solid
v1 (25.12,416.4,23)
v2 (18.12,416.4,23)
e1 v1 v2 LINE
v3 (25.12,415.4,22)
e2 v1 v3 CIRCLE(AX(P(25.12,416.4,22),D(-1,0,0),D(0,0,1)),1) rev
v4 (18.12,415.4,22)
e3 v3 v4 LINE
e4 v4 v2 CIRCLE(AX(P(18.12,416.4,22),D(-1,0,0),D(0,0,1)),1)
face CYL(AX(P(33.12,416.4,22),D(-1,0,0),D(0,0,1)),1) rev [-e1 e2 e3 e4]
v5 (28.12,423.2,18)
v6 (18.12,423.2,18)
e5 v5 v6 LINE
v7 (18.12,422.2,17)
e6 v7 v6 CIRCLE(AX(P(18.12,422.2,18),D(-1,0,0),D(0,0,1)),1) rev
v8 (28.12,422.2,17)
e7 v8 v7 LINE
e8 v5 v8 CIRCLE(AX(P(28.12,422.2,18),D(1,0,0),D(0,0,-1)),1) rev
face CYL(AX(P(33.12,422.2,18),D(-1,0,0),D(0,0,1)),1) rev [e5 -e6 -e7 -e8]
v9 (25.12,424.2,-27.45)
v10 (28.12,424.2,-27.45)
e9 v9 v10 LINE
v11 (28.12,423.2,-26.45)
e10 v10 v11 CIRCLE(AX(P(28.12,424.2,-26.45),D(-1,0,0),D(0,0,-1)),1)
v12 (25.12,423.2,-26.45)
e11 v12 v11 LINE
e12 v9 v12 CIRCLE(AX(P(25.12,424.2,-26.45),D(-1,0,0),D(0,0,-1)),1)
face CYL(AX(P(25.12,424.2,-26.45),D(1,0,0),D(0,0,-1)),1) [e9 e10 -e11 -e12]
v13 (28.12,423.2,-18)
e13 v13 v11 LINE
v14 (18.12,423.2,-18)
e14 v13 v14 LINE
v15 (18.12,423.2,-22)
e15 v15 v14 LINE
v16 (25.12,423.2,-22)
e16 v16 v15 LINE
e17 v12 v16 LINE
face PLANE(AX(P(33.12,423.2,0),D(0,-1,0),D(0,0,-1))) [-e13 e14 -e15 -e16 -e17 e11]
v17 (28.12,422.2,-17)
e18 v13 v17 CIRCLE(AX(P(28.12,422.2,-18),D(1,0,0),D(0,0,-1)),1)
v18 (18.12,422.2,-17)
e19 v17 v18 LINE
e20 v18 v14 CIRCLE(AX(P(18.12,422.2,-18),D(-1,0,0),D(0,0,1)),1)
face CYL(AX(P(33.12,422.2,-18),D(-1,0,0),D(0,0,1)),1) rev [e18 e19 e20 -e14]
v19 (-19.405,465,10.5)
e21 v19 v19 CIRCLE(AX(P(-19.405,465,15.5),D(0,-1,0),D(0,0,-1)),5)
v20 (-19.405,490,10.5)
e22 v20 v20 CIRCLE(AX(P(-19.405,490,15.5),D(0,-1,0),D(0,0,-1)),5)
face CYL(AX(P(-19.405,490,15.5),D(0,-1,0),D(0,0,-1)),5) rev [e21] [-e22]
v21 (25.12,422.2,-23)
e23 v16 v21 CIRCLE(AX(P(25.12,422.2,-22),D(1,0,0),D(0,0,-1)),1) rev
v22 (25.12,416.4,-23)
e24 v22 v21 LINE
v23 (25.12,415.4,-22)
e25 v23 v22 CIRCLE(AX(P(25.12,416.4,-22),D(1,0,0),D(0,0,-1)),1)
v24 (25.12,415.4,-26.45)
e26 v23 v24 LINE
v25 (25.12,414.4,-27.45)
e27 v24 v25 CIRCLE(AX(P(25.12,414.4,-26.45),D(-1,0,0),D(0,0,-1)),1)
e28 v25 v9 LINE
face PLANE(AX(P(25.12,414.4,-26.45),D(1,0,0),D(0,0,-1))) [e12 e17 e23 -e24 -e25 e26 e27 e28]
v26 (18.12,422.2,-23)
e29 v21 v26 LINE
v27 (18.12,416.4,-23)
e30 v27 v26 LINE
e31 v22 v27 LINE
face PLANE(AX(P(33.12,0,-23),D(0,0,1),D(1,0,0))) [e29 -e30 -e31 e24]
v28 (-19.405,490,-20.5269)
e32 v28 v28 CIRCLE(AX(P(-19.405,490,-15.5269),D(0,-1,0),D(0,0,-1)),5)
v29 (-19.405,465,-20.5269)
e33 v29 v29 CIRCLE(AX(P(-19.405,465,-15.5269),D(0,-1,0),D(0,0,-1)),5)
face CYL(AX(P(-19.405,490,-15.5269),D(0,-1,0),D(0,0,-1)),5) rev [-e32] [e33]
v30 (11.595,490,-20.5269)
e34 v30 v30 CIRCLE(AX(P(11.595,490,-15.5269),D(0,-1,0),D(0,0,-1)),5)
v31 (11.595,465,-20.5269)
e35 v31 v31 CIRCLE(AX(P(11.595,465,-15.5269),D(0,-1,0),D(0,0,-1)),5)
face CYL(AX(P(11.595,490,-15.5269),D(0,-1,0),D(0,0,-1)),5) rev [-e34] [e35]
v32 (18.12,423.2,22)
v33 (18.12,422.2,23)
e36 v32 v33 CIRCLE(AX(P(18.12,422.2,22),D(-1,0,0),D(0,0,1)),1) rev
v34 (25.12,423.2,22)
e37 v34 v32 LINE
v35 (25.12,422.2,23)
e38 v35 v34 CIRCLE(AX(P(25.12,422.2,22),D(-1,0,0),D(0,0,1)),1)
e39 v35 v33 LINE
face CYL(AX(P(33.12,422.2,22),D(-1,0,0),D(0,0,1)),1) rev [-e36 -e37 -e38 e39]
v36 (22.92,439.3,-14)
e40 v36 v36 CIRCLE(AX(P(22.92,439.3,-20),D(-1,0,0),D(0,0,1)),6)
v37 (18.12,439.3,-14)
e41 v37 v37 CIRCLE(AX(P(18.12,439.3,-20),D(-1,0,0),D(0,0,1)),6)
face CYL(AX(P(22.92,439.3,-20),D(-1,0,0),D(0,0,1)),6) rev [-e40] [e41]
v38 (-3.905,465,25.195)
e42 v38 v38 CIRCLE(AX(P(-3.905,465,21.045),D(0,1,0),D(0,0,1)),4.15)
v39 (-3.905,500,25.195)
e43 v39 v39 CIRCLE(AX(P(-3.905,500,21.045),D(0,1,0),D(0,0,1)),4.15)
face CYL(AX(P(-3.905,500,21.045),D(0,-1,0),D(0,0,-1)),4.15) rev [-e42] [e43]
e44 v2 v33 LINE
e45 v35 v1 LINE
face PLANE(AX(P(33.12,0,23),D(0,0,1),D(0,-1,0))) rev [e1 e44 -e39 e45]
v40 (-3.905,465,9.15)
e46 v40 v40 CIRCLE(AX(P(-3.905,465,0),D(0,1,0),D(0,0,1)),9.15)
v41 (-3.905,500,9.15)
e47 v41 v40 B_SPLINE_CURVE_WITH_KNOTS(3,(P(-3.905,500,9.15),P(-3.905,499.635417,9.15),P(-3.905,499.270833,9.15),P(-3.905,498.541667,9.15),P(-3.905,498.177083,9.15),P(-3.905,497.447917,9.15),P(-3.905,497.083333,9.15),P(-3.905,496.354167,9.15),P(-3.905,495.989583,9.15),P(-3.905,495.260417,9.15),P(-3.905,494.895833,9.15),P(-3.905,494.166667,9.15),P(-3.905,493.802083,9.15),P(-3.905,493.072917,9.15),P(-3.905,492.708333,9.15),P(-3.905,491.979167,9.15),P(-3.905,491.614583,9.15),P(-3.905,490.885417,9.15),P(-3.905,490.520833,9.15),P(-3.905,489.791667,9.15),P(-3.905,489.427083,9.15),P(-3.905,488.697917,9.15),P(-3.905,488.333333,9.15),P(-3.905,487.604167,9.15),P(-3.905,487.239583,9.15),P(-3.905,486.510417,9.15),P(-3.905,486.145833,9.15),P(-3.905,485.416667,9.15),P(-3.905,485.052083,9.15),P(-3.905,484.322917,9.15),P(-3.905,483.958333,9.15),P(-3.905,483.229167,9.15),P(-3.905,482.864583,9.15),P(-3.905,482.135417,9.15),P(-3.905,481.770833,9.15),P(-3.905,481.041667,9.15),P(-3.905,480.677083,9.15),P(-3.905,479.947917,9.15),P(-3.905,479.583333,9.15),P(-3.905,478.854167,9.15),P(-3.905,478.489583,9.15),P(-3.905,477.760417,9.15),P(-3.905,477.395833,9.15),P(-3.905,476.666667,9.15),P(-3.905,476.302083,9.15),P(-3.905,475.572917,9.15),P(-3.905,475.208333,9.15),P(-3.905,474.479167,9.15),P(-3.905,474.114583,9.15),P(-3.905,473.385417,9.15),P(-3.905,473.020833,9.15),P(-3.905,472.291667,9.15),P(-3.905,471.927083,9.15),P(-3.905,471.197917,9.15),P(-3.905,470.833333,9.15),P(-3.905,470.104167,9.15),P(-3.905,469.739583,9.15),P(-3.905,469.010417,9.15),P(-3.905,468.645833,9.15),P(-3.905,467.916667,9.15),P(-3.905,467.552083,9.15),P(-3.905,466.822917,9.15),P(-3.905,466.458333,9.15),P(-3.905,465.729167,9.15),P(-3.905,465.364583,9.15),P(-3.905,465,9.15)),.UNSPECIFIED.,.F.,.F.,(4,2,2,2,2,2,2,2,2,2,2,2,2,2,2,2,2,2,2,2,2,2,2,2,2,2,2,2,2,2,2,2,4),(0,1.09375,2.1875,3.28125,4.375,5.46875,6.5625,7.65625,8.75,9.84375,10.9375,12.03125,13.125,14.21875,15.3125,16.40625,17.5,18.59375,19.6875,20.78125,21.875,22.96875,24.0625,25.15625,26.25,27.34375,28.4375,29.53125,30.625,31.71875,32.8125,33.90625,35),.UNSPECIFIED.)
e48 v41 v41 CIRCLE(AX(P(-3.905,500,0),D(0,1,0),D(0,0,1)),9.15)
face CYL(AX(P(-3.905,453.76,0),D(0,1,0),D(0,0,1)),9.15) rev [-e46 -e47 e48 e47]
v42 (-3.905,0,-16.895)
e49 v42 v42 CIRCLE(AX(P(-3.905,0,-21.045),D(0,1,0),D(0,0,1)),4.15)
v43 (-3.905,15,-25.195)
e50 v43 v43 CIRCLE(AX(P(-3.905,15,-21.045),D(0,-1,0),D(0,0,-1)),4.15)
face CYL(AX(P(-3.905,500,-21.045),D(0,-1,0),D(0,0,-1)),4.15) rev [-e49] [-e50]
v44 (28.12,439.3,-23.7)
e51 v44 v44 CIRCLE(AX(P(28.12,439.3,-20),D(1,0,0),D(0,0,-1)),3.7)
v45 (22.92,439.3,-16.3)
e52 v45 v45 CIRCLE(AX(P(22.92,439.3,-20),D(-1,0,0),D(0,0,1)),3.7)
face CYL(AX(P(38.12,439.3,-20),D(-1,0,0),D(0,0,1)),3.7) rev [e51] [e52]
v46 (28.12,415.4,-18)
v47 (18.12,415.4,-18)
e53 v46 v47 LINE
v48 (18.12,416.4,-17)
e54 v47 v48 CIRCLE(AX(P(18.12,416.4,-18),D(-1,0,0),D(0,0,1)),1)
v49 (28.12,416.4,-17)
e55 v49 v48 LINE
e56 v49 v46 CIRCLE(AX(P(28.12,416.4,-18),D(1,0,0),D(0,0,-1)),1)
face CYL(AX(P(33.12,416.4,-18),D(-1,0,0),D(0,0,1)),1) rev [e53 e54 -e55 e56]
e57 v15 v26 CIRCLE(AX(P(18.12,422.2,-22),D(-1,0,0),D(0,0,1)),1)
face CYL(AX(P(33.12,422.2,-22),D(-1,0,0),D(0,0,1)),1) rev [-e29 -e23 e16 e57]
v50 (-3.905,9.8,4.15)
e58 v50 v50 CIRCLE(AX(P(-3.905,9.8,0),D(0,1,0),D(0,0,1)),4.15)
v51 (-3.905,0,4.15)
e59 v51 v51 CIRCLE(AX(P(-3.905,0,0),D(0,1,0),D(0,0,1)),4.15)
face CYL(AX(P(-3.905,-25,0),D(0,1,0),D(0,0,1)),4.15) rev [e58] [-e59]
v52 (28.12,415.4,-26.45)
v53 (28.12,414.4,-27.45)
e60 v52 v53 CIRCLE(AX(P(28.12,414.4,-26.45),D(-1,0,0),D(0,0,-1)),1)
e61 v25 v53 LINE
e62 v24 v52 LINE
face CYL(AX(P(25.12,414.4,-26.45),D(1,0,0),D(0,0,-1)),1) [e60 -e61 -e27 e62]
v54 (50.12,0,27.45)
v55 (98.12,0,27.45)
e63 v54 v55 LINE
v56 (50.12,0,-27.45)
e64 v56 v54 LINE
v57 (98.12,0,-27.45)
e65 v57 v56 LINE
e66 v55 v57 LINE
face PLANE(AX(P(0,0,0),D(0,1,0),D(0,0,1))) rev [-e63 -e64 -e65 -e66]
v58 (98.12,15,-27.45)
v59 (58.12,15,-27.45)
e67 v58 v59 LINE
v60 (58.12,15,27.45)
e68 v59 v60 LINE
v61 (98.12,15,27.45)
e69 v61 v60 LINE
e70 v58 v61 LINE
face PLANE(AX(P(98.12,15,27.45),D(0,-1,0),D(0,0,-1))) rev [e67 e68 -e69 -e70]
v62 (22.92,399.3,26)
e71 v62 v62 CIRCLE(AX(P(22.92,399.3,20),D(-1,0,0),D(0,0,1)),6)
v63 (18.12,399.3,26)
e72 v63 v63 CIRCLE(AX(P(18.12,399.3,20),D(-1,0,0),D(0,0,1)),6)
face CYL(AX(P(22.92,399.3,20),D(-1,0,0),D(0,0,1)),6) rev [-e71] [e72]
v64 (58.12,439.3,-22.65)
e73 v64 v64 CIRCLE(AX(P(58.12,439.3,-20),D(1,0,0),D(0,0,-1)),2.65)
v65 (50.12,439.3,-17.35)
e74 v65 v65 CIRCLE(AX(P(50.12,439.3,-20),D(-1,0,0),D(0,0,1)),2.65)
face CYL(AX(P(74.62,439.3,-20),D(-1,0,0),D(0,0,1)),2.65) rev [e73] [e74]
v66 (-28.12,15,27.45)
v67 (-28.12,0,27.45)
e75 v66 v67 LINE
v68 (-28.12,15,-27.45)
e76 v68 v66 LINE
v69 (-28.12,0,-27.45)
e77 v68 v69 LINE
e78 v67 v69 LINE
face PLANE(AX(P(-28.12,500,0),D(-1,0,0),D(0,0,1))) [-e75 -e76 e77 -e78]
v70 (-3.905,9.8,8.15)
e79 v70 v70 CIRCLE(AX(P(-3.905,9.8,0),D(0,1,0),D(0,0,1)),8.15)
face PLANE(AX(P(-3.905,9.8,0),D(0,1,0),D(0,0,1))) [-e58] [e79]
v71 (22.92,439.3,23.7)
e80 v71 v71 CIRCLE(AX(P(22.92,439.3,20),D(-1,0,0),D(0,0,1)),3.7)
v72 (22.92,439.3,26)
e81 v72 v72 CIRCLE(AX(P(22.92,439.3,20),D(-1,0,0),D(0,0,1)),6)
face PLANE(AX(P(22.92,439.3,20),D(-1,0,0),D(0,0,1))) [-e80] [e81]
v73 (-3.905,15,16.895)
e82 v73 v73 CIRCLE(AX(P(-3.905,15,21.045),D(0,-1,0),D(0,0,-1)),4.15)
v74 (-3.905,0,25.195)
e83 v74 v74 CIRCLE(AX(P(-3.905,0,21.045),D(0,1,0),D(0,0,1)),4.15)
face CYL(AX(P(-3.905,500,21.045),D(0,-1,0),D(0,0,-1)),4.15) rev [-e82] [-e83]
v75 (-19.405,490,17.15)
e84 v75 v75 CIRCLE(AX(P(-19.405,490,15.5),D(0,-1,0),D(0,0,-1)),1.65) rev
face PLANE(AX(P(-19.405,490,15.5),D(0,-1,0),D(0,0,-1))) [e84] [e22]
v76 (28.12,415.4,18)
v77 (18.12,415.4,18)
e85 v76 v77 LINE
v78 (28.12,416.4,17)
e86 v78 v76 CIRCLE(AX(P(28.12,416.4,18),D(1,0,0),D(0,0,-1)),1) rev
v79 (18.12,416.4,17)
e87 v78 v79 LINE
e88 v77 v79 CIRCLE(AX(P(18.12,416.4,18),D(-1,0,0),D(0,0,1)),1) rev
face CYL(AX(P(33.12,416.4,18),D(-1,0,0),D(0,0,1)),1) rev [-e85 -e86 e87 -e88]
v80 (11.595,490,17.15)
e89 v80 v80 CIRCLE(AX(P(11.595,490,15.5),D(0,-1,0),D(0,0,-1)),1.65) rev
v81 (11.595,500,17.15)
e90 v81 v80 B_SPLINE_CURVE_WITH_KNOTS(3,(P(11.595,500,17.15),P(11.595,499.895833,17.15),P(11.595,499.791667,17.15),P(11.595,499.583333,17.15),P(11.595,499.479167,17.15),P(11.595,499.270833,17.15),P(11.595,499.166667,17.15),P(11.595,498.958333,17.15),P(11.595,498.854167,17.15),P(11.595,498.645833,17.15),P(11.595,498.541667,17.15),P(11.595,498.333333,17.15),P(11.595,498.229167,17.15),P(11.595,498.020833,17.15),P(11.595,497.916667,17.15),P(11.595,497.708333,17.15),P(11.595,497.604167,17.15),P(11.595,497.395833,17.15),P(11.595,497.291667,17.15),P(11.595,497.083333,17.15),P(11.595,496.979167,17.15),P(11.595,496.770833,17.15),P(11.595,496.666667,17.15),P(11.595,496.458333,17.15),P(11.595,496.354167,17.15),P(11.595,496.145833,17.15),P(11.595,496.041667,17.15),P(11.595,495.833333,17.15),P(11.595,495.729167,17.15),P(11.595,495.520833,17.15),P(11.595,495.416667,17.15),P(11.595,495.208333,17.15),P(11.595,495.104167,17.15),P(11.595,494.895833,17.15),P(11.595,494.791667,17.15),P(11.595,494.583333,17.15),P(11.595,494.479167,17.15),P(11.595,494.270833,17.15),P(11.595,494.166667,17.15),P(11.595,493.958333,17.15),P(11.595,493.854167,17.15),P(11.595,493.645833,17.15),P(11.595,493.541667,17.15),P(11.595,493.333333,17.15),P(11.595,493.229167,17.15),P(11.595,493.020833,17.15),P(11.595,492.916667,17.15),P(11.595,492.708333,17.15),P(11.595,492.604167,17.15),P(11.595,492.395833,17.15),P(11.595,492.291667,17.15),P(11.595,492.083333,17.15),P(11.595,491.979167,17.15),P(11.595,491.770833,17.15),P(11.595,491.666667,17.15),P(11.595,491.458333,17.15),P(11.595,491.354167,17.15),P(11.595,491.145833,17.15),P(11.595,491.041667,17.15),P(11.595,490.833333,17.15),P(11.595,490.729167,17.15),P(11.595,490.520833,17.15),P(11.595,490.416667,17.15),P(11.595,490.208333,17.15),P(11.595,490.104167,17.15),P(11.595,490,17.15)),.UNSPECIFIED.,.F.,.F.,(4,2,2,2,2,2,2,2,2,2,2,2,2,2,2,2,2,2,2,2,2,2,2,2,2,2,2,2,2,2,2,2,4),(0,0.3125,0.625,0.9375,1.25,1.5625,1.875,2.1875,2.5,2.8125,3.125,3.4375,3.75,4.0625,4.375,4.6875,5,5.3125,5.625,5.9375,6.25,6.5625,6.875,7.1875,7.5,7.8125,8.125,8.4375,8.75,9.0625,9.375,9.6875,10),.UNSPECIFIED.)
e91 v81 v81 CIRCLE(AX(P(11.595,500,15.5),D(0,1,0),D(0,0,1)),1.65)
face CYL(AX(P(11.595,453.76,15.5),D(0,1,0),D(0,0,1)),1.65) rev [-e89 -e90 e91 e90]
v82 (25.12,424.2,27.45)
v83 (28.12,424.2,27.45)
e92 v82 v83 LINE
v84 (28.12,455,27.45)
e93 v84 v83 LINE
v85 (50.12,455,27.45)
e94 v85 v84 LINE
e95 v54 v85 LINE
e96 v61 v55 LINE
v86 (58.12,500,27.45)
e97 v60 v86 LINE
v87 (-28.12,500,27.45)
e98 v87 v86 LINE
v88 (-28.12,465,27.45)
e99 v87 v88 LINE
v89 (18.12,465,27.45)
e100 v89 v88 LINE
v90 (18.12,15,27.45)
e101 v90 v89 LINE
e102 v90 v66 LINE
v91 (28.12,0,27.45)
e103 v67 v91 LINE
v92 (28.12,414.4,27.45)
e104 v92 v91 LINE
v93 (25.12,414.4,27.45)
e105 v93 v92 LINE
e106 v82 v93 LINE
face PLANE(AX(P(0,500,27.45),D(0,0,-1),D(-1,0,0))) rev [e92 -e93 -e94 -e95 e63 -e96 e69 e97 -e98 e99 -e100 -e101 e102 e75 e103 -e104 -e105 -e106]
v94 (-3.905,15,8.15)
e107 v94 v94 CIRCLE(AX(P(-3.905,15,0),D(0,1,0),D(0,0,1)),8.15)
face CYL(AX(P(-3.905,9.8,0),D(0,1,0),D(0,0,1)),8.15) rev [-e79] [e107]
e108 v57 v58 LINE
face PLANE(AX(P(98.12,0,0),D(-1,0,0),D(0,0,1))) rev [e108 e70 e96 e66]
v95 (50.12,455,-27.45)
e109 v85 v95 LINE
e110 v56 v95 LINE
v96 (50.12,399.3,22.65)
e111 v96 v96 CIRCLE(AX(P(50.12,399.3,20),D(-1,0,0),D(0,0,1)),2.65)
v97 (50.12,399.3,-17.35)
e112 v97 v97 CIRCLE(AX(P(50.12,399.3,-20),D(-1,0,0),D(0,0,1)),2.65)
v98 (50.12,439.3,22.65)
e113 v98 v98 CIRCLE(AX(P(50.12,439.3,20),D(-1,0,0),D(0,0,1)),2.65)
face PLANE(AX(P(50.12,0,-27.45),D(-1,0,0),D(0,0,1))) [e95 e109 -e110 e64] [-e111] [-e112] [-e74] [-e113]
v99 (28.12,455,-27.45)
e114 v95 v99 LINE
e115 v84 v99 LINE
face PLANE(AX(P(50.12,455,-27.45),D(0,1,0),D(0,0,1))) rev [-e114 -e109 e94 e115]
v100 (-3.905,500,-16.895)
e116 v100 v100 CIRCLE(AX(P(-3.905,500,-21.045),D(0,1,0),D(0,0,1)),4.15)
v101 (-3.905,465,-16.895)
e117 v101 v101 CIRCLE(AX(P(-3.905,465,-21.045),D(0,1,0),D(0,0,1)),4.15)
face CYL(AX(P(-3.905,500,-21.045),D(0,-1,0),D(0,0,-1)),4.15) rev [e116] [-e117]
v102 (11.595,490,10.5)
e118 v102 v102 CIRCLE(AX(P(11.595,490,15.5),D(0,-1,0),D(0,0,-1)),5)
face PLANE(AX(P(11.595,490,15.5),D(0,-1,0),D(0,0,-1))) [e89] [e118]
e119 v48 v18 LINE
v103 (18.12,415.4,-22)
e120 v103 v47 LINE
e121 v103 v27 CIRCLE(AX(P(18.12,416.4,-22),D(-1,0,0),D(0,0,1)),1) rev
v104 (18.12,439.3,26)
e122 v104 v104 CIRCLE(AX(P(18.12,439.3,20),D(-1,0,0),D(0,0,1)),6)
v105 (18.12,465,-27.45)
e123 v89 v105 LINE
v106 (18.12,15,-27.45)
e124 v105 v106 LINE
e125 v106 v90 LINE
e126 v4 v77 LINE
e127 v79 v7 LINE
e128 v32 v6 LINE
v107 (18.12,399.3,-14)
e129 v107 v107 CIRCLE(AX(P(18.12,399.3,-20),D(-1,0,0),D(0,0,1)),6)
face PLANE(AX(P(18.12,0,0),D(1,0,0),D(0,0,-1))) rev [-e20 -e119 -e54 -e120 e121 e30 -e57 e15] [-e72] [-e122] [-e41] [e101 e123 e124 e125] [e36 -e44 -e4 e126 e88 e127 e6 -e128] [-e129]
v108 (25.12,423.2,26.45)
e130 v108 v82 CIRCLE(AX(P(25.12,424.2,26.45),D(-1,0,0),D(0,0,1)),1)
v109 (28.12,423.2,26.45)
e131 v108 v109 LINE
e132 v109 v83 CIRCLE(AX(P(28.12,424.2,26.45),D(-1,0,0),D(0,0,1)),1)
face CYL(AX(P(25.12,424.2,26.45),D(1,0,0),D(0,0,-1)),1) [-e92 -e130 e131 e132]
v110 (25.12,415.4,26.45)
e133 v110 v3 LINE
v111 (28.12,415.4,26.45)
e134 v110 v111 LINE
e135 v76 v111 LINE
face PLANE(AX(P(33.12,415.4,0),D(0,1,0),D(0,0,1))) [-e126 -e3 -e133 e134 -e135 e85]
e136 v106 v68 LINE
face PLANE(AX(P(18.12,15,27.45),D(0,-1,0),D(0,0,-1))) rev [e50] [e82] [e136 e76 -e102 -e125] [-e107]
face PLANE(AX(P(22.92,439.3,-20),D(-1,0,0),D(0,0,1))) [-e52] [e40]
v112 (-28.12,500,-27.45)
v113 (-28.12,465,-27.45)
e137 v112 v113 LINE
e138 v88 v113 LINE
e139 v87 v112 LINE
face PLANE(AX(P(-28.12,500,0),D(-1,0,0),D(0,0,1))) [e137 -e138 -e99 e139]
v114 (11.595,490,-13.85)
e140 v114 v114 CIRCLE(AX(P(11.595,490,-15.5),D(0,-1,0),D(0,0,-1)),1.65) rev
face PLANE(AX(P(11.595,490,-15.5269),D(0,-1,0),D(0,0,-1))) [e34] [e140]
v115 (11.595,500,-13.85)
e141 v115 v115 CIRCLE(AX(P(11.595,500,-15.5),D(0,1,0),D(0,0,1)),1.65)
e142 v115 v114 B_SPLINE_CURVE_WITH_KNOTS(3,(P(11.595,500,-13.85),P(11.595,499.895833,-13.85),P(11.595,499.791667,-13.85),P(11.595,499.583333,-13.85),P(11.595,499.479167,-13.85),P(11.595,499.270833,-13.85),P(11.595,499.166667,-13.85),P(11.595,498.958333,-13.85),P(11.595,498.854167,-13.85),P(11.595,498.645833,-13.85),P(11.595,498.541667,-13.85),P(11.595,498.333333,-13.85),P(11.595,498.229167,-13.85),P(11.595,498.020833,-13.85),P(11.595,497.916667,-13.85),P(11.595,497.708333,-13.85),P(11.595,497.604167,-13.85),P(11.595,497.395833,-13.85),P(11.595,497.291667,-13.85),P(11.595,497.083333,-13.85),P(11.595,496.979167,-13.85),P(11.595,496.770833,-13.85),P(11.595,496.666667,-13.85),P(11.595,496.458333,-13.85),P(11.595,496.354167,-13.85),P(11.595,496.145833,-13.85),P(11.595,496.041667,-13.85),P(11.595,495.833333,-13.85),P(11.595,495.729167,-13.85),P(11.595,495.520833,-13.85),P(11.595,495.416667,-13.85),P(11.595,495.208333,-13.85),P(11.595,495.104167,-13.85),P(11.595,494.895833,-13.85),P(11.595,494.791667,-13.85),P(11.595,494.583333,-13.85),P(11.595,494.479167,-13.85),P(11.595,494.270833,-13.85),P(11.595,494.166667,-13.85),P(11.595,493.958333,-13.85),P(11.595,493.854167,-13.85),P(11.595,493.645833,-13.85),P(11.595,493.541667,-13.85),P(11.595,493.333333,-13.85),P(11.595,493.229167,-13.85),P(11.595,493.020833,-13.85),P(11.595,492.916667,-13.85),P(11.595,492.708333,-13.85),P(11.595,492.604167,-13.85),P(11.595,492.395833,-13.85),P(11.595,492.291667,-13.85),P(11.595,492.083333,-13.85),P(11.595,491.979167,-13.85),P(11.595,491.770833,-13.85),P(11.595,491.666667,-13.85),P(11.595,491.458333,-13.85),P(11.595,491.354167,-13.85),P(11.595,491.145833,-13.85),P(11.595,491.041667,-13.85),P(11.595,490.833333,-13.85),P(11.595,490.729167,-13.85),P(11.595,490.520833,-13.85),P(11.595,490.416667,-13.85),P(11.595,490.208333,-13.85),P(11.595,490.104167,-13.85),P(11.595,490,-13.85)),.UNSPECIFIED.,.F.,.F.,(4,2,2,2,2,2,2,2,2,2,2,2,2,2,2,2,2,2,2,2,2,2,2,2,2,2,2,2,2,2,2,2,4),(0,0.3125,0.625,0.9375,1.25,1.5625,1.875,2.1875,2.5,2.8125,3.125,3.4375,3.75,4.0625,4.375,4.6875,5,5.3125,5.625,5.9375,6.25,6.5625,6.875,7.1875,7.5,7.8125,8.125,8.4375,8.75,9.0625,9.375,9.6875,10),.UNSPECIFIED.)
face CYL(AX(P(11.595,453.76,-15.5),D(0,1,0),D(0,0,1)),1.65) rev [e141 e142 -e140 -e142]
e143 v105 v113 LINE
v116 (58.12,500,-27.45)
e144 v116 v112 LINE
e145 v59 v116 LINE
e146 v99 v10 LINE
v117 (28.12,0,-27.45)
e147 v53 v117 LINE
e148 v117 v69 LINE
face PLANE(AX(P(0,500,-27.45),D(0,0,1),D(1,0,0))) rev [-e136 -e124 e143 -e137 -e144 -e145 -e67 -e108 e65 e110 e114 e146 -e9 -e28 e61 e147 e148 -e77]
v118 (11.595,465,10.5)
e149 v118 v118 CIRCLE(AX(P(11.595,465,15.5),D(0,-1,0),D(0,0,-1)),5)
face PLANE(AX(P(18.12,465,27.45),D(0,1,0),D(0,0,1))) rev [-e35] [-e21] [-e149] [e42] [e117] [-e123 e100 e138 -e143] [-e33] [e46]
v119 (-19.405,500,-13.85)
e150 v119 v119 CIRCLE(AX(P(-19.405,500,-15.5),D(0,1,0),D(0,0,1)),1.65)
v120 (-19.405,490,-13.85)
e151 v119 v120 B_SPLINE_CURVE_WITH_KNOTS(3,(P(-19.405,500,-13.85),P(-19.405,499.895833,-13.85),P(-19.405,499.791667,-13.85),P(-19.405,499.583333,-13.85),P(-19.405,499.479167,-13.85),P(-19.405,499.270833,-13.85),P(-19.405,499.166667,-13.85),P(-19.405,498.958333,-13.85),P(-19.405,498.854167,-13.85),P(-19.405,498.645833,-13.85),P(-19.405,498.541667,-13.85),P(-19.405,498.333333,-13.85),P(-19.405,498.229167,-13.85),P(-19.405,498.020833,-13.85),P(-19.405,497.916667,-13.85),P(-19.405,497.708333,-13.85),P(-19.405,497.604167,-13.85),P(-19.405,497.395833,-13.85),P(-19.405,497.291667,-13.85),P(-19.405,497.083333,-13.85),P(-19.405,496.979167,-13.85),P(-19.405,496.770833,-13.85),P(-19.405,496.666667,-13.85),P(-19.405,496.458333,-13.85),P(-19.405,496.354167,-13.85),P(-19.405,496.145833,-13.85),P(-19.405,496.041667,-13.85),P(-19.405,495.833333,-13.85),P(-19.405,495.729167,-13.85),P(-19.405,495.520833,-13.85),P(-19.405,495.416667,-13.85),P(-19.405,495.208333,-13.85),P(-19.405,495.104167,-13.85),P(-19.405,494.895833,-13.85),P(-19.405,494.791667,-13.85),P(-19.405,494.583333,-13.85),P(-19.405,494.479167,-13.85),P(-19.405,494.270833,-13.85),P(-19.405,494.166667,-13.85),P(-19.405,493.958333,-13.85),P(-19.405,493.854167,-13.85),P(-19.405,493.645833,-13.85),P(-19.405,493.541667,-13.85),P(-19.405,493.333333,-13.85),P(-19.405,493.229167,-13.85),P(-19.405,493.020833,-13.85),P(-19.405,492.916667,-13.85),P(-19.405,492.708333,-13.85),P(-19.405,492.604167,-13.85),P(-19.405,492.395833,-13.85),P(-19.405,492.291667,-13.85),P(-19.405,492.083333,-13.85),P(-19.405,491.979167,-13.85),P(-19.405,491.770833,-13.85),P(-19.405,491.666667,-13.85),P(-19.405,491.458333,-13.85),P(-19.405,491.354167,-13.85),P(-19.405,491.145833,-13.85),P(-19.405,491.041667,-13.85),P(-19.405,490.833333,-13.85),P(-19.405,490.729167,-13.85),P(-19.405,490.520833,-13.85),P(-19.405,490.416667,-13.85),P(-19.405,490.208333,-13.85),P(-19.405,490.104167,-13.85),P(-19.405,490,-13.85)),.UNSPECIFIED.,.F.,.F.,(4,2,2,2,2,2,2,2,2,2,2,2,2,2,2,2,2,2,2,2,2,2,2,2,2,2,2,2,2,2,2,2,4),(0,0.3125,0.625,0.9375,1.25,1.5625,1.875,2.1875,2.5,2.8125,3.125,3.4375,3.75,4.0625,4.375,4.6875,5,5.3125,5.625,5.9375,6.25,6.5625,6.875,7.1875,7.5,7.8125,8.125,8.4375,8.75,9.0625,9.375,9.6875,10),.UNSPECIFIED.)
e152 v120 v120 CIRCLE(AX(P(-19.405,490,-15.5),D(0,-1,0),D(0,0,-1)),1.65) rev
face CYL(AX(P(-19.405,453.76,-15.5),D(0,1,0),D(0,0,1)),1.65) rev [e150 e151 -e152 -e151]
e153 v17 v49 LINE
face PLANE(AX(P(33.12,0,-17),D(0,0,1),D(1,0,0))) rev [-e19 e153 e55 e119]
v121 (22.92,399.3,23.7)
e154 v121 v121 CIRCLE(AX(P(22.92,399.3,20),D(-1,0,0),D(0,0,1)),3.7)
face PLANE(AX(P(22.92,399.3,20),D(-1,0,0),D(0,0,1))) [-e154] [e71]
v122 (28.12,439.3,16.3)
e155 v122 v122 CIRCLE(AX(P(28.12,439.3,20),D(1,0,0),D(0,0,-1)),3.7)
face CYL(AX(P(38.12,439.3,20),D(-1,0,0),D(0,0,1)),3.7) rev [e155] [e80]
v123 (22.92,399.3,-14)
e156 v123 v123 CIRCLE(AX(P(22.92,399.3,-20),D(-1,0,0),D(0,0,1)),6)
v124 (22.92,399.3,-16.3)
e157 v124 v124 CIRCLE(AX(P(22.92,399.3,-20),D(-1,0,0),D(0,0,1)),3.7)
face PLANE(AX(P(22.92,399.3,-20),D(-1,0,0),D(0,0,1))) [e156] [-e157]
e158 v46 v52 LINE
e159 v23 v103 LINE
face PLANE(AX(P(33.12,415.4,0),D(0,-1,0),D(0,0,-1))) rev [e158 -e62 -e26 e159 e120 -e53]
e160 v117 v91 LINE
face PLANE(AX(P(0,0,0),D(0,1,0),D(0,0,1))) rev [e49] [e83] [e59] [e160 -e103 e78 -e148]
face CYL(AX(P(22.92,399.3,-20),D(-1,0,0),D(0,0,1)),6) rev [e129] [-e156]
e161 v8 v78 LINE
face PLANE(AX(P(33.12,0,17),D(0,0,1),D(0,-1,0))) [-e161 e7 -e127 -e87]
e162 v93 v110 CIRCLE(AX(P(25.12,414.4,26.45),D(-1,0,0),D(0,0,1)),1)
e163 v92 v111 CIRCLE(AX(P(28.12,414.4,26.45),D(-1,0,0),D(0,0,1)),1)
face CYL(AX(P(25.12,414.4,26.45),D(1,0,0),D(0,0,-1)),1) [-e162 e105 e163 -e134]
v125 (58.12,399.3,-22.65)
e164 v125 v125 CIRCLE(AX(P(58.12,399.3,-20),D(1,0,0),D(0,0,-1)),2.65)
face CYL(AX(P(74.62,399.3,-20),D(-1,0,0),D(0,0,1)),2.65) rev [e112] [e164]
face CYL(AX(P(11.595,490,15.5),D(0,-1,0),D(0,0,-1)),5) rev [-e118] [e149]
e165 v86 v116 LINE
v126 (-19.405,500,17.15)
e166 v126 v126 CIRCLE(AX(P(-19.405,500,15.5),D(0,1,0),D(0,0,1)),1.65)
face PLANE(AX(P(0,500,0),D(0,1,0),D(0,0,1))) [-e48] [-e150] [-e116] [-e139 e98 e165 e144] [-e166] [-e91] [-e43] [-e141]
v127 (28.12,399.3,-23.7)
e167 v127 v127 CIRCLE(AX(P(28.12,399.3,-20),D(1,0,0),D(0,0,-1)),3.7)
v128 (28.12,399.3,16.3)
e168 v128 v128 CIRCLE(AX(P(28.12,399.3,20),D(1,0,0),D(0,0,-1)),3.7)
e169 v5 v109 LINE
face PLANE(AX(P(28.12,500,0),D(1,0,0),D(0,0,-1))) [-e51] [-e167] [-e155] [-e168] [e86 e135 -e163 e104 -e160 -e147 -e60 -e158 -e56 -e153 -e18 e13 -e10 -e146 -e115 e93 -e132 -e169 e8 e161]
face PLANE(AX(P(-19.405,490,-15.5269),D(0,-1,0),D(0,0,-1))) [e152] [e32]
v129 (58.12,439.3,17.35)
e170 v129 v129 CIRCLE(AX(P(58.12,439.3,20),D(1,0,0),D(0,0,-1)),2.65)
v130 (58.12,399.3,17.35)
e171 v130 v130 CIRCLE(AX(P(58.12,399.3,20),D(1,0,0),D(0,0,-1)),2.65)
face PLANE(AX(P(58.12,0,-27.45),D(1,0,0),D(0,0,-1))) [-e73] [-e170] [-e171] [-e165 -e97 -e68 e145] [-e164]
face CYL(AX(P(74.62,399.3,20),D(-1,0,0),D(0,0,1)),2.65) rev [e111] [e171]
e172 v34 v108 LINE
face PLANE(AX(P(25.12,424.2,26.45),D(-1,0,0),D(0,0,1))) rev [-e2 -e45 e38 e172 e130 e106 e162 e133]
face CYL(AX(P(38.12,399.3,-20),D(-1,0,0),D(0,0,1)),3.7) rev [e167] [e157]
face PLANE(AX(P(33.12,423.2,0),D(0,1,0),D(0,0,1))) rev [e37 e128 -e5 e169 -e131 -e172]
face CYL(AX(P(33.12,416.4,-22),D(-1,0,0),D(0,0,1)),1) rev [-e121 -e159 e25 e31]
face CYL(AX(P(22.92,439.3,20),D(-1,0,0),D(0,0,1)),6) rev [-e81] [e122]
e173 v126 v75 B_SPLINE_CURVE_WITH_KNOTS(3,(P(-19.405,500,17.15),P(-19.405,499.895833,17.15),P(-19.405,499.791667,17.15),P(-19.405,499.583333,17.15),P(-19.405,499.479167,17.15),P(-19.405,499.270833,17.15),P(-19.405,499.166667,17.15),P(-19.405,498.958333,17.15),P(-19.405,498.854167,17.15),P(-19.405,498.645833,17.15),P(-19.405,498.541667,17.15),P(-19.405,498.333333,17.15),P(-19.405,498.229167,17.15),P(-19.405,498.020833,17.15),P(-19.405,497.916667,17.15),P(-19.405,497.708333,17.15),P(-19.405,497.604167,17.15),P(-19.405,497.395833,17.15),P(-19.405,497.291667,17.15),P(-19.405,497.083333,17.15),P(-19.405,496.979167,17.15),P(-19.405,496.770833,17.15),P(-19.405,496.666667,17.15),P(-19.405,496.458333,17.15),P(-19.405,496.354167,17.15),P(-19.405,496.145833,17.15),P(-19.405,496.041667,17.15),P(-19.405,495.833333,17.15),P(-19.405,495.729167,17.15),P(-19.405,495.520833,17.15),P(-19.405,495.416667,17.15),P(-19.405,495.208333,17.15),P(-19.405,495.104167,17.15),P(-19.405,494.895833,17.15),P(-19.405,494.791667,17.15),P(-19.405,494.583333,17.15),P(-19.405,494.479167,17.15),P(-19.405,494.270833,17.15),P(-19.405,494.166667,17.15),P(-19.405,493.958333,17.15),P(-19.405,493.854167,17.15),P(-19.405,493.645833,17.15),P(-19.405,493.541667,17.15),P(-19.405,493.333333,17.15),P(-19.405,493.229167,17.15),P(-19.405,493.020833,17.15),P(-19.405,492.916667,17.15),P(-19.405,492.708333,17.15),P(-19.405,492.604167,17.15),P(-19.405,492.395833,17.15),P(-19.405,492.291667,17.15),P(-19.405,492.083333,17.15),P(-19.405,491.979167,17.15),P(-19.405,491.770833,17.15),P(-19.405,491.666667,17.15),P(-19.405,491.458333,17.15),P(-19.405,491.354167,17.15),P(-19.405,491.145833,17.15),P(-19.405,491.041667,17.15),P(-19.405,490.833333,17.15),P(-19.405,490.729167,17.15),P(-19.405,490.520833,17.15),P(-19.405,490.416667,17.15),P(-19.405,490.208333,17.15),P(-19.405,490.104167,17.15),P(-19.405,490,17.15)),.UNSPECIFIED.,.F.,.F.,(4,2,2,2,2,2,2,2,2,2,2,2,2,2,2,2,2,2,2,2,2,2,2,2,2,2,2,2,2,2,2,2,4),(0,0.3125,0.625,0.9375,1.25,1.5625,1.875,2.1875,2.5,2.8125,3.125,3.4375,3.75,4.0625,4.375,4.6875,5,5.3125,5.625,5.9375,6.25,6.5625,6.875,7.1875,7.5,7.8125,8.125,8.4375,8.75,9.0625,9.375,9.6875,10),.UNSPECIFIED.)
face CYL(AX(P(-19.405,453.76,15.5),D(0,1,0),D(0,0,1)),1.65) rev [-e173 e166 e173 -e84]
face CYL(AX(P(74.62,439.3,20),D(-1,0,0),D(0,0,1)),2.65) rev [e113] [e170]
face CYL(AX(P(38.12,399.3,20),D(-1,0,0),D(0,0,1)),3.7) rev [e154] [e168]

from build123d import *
from OCP.BRepAlgoAPI import BRepAlgoAPI_Cut
from OCP.TopTools import TopTools_ListOfShape

# Parameters (mm, degrees)
SKETCH1_W           = 56.24
SKETCH1_H           = 54.9
SKETCH1_R           = 4.15
BOSS_EXTRUDE1_DEPTH = 500
SKETCH3_W           = 54.9
SKETCH3_H           = 450
CUT_EXTRUDE1_DEPTH  = 46.24
SKETCH6_R           = 9.15
SKETCH6_R_2         = 1.65
CUT_EXTRUDE2_DEPTH  = 46.24
SKETCH8_R           = 4.15
CUT_EXTRUDE4_DEPTH  = 40
SKETCH8_6_R         = 8.15
SKETCH8_6_R_2       = 4.15
CUT_EXTRUDE5_DEPTH  = 5.2
SKETCH10_W          = 54.9
SKETCH10_H          = 45
BOSS_EXTRUDE2_DEPTH = 22
SKETCH11_W          = 8
SKETCH11_H          = 54.900000346
BOSS_EXTRUDE3_DEPTH = 500
SKETCH12_R          = 3.7
CUT_EXTRUDE7_DEPTH  = 20
SKETCH12_4_R        = 6
SKETCH12_4_R_2      = 3.7
CUT_EXTRUDE8_DEPTH  = 4.8
SKETCH13_W          = 54.900000346
SKETCH13_H          = 15
BOSS_EXTRUDE4_DEPTH = 40
SKETCH14_R          = 5
CUT_EXTRUDE9_DEPTH  = 25
SKETCH15_R          = 2.65
CUT_EXTRUDE10_DEPTH = 24.5
CUT_EXTRUDE11_DEPTH = 15
CUT_EXTRUDE14_DEPTH = 3


with BuildPart() as part:
    # Sketch1 → Boss-Extrude1 (new body)
    with BuildSketch(Plane(origin=(0, 0, 0), x_dir=(1, 0, 0), z_dir=(0, 1, 0))):
        Rectangle(SKETCH1_W, SKETCH1_H)
        with Locations((-3.905000488, -21.045000488)):
            Circle(SKETCH1_R, mode=Mode.SUBTRACT)
        with Locations((-3.905000488, 21.044999843)):
            Circle(SKETCH1_R, mode=Mode.SUBTRACT)
    extrude(amount=BOSS_EXTRUDE1_DEPTH)

    # Sketch3 → Cut-Extrude1 (cut)
    with BuildSketch(Plane.ZY.offset(28.12)):
        with Locations((0, 240)):
            Rectangle(SKETCH3_W, SKETCH3_H)
    extrude(amount=-CUT_EXTRUDE1_DEPTH, mode=Mode.SUBTRACT)

    # Sketch6 → Cut-Extrude2 (cut)
    with BuildSketch(Plane(origin=(0, 500, 0), x_dir=(1, 0, 0), z_dir=(0, 1, 0))):
        with Locations((-3.905000488, -3.23e-07)):
            Circle(SKETCH6_R)
        with Locations((-19.405000488, 15.5)):
            Circle(SKETCH6_R_2)
        with Locations((11.594999512, 15.5)):
            Circle(SKETCH6_R_2)
        with Locations((11.594999512, -15.5)):
            Circle(SKETCH6_R_2)
        with Locations((-19.405000488, -15.5)):
            Circle(SKETCH6_R_2)
    extrude(amount=-CUT_EXTRUDE2_DEPTH, mode=Mode.SUBTRACT)

    # Sketch8 → Cut-Extrude4 (cut)
    with BuildSketch(Plane(origin=(0, 15, 0), x_dir=(1, 0, 0), z_dir=(0, 1, 0))):
        with Locations((-3.905000488, -3.23e-07)):
            Circle(SKETCH8_R)
    extrude(amount=-CUT_EXTRUDE4_DEPTH, mode=Mode.SUBTRACT)

    # Sketch8<6> → Cut-Extrude5 (cut)
    with BuildSketch(Plane(origin=(0, 15, 0), x_dir=(1, 0, 0), z_dir=(0, 1, 0))):
        with Locations((-3.905000488, -3.23e-07)):
            Circle(SKETCH8_6_R)
        with Locations((-3.905000488, -3.23e-07)):
            Circle(SKETCH8_6_R_2, mode=Mode.SUBTRACT)
    extrude(amount=-CUT_EXTRUDE5_DEPTH, mode=Mode.SUBTRACT)

    # Sketch10 → Boss-Extrude2 (add)
    with BuildSketch(Plane(origin=(28.12, 0, 0), x_dir=(0, 0, -1), z_dir=(1, 0, 0))):
        with Locations((0, 477.5)):
            Rectangle(SKETCH10_W, SKETCH10_H)
    extrude(amount=BOSS_EXTRUDE2_DEPTH)

    # Sketch11 → Boss-Extrude3 (add)
    with BuildSketch(Plane(origin=(0, 500, 0), x_dir=(1, 0, 0), z_dir=(0, 1, 0))):
        with Locations((54.12, -1.73e-07)):
            Rectangle(SKETCH11_W, SKETCH11_H)
    extrude(amount=-BOSS_EXTRUDE3_DEPTH)

    # Sketch12 → Cut-Extrude7 (cut)
    with BuildSketch(Plane.ZY.offset(-18.12)):
        with Locations((-20, 439.3)):
            Circle(SKETCH12_R)
        with Locations((20, 439.3)):
            Circle(SKETCH12_R)
        with Locations((20, 399.3)):
            Circle(SKETCH12_R)
        with Locations((-20, 399.3)):
            Circle(SKETCH12_R)
    extrude(amount=-CUT_EXTRUDE7_DEPTH, mode=Mode.SUBTRACT)

    # Sketch12<4> → Cut-Extrude8 (cut)
    # profile 1 of 4: a face of its own
    with BuildSketch(Plane.ZY.offset(-18.12)):
        with Locations((-20, 439.3)):
            Circle(SKETCH12_4_R)
        with Locations((-20, 439.3)):
            Circle(SKETCH12_4_R_2, mode=Mode.SUBTRACT)
    # profile 2 of 4: a face of its own
    with BuildSketch(Plane.ZY.offset(-18.12)):
        with Locations((20, 439.3)):
            Circle(SKETCH12_4_R)
        with Locations((20, 439.3)):
            Circle(SKETCH12_4_R_2, mode=Mode.SUBTRACT)
    # profile 3 of 4: a face of its own
    with BuildSketch(Plane.ZY.offset(-18.12)):
        with Locations((20, 399.3)):
            Circle(SKETCH12_4_R)
        with Locations((20, 399.3)):
            Circle(SKETCH12_4_R_2, mode=Mode.SUBTRACT)
    # profile 4 of 4: a face of its own
    with BuildSketch(Plane.ZY.offset(-18.12)):
        with Locations((-20, 399.3)):
            Circle(SKETCH12_4_R)
        with Locations((-20, 399.3)):
            Circle(SKETCH12_4_R_2, mode=Mode.SUBTRACT)
    extrude(amount=-CUT_EXTRUDE8_DEPTH, mode=Mode.SUBTRACT)

    # Sketch13 → Boss-Extrude4 (add)
    with BuildSketch(Plane(origin=(58.12, 0, 0), x_dir=(0, 0, -1), z_dir=(1, 0, 0))):
        with Locations((-1.73e-07, 7.5)):
            Rectangle(SKETCH13_W, SKETCH13_H)
    extrude(amount=BOSS_EXTRUDE4_DEPTH)

    # Sketch14 → Cut-Extrude9 (cut)
    with BuildSketch(Plane.XZ.offset(-465)):
        with Locations((-19.405000488, 15.5)):
            Circle(SKETCH14_R)
        with Locations((11.594999512, 15.5)):
            Circle(SKETCH14_R)
        with Locations((11.594999512, -15.526899995)):
            Circle(SKETCH14_R)
        with Locations((-19.405000488, -15.526899995)):
            Circle(SKETCH14_R)
    extrude(amount=-CUT_EXTRUDE9_DEPTH, mode=Mode.SUBTRACT)

    # Sketch15 → Cut-Extrude10 (cut)
    with BuildSketch(Plane.ZY.offset(-50.12)):
        with Locations((-20, 439.3)):
            Circle(SKETCH15_R)
        with Locations((20, 439.3)):
            Circle(SKETCH15_R)
        with Locations((20, 399.3)):
            Circle(SKETCH15_R)
        with Locations((-20, 399.3)):
            Circle(SKETCH15_R)
    extrude(amount=-CUT_EXTRUDE10_DEPTH, mode=Mode.SUBTRACT)

    # Sketch16 → Cut-Extrude11 (cut)
    with BuildSketch(Plane.ZY.offset(-18.12)):
        with BuildLine():
            ThreePointArc((22, 415.4), (22.707106781, 415.692893219), (23, 416.4))
            Line((23, 416.4), (23, 422.2))
            ThreePointArc((23, 422.2), (22.707106781, 422.907106781), (22, 423.2))
            Line((22, 423.2), (18, 423.2))
            ThreePointArc((18, 423.2), (17.292893219, 422.907106781), (17, 422.2))
            Line((17, 422.2), (17, 416.4))
            ThreePointArc((17, 416.4), (17.292893219, 415.692893219), (18, 415.4))
            Line((18, 415.4), (22, 415.4))
        make_face()
        with BuildLine():
            ThreePointArc((-23, 416.4), (-22.707106781, 415.692893219), (-22, 415.4))
            Line((-22, 415.4), (-18, 415.4))
            ThreePointArc((-18, 415.4), (-17.292893219, 415.692893219), (-17, 416.4))
            Line((-17, 416.4), (-17, 422.2))
            ThreePointArc((-17, 422.2), (-17.292893219, 422.907106781), (-18, 423.2))
            Line((-18, 423.2), (-22, 423.2))
            ThreePointArc((-22, 423.2), (-22.707106781, 422.907106781), (-23, 422.2))
            Line((-23, 422.2), (-23, 416.4))
        make_face()
    extrude(amount=-CUT_EXTRUDE11_DEPTH, mode=Mode.SUBTRACT)


with BuildPart() as cut_extrude14_tool:
    # Sketch18 → Cut-Extrude14 (new body)
    with BuildSketch(Plane(origin=(28.12, 0, 0), x_dir=(0, 0, -1), z_dir=(1, 0, 0))):
        with BuildLine():
            Line((26.449999654, 423.2), (22, 423.2))
            Line((22, 423.2), (22, 415.4))
            Line((22, 415.4), (26.449999654, 415.4))
            ThreePointArc((26.449999654, 415.4), (27.157106435, 415.107106781), (27.449999654, 414.4))
            Line((27.449999654, 414.4), (27.449999654, 424.2))
            ThreePointArc((27.449999654, 424.2), (27.157106435, 423.492893219), (26.449999654, 423.2))
        make_face()
        with BuildLine():
            Line((-27.449999654, 424.2), (-27.449999654, 414.4))
            ThreePointArc((-27.449999654, 414.4), (-27.157106435, 415.107106781), (-26.449999654, 415.4))
            Line((-26.449999654, 415.4), (-22, 415.4))
            Line((-22, 415.4), (-22, 423.2))
            Line((-22, 423.2), (-26.449999654, 423.2))
            ThreePointArc((-26.449999654, 423.2), (-27.157106435, 423.492893219), (-27.449999654, 424.2))
        make_face()
    extrude(amount=-CUT_EXTRUDE14_DEPTH)


with BuildPart() as part_1:
    add(part.part)

    # Cut-Extrude14: cut by cut_extrude14_tool, with a tolerance
    cut_extrude14_stock = TopTools_ListOfShape()
    cut_extrude14_stock.Append(part_1.part.wrapped)
    cut_extrude14_tools = TopTools_ListOfShape()
    cut_extrude14_tools.Append(cut_extrude14_tool.part.wrapped)
    cut_extrude14_cut = BRepAlgoAPI_Cut()
    cut_extrude14_cut.SetArguments(cut_extrude14_stock)
    cut_extrude14_cut.SetTools(cut_extrude14_tools)
    cut_extrude14_cut.SetFuzzyValue(0.00001)
    cut_extrude14_cut.Build()
    add(Compound.cast(cut_extrude14_cut.Shape()).solids(), mode=Mode.REPLACE)


solid = part_1.part
